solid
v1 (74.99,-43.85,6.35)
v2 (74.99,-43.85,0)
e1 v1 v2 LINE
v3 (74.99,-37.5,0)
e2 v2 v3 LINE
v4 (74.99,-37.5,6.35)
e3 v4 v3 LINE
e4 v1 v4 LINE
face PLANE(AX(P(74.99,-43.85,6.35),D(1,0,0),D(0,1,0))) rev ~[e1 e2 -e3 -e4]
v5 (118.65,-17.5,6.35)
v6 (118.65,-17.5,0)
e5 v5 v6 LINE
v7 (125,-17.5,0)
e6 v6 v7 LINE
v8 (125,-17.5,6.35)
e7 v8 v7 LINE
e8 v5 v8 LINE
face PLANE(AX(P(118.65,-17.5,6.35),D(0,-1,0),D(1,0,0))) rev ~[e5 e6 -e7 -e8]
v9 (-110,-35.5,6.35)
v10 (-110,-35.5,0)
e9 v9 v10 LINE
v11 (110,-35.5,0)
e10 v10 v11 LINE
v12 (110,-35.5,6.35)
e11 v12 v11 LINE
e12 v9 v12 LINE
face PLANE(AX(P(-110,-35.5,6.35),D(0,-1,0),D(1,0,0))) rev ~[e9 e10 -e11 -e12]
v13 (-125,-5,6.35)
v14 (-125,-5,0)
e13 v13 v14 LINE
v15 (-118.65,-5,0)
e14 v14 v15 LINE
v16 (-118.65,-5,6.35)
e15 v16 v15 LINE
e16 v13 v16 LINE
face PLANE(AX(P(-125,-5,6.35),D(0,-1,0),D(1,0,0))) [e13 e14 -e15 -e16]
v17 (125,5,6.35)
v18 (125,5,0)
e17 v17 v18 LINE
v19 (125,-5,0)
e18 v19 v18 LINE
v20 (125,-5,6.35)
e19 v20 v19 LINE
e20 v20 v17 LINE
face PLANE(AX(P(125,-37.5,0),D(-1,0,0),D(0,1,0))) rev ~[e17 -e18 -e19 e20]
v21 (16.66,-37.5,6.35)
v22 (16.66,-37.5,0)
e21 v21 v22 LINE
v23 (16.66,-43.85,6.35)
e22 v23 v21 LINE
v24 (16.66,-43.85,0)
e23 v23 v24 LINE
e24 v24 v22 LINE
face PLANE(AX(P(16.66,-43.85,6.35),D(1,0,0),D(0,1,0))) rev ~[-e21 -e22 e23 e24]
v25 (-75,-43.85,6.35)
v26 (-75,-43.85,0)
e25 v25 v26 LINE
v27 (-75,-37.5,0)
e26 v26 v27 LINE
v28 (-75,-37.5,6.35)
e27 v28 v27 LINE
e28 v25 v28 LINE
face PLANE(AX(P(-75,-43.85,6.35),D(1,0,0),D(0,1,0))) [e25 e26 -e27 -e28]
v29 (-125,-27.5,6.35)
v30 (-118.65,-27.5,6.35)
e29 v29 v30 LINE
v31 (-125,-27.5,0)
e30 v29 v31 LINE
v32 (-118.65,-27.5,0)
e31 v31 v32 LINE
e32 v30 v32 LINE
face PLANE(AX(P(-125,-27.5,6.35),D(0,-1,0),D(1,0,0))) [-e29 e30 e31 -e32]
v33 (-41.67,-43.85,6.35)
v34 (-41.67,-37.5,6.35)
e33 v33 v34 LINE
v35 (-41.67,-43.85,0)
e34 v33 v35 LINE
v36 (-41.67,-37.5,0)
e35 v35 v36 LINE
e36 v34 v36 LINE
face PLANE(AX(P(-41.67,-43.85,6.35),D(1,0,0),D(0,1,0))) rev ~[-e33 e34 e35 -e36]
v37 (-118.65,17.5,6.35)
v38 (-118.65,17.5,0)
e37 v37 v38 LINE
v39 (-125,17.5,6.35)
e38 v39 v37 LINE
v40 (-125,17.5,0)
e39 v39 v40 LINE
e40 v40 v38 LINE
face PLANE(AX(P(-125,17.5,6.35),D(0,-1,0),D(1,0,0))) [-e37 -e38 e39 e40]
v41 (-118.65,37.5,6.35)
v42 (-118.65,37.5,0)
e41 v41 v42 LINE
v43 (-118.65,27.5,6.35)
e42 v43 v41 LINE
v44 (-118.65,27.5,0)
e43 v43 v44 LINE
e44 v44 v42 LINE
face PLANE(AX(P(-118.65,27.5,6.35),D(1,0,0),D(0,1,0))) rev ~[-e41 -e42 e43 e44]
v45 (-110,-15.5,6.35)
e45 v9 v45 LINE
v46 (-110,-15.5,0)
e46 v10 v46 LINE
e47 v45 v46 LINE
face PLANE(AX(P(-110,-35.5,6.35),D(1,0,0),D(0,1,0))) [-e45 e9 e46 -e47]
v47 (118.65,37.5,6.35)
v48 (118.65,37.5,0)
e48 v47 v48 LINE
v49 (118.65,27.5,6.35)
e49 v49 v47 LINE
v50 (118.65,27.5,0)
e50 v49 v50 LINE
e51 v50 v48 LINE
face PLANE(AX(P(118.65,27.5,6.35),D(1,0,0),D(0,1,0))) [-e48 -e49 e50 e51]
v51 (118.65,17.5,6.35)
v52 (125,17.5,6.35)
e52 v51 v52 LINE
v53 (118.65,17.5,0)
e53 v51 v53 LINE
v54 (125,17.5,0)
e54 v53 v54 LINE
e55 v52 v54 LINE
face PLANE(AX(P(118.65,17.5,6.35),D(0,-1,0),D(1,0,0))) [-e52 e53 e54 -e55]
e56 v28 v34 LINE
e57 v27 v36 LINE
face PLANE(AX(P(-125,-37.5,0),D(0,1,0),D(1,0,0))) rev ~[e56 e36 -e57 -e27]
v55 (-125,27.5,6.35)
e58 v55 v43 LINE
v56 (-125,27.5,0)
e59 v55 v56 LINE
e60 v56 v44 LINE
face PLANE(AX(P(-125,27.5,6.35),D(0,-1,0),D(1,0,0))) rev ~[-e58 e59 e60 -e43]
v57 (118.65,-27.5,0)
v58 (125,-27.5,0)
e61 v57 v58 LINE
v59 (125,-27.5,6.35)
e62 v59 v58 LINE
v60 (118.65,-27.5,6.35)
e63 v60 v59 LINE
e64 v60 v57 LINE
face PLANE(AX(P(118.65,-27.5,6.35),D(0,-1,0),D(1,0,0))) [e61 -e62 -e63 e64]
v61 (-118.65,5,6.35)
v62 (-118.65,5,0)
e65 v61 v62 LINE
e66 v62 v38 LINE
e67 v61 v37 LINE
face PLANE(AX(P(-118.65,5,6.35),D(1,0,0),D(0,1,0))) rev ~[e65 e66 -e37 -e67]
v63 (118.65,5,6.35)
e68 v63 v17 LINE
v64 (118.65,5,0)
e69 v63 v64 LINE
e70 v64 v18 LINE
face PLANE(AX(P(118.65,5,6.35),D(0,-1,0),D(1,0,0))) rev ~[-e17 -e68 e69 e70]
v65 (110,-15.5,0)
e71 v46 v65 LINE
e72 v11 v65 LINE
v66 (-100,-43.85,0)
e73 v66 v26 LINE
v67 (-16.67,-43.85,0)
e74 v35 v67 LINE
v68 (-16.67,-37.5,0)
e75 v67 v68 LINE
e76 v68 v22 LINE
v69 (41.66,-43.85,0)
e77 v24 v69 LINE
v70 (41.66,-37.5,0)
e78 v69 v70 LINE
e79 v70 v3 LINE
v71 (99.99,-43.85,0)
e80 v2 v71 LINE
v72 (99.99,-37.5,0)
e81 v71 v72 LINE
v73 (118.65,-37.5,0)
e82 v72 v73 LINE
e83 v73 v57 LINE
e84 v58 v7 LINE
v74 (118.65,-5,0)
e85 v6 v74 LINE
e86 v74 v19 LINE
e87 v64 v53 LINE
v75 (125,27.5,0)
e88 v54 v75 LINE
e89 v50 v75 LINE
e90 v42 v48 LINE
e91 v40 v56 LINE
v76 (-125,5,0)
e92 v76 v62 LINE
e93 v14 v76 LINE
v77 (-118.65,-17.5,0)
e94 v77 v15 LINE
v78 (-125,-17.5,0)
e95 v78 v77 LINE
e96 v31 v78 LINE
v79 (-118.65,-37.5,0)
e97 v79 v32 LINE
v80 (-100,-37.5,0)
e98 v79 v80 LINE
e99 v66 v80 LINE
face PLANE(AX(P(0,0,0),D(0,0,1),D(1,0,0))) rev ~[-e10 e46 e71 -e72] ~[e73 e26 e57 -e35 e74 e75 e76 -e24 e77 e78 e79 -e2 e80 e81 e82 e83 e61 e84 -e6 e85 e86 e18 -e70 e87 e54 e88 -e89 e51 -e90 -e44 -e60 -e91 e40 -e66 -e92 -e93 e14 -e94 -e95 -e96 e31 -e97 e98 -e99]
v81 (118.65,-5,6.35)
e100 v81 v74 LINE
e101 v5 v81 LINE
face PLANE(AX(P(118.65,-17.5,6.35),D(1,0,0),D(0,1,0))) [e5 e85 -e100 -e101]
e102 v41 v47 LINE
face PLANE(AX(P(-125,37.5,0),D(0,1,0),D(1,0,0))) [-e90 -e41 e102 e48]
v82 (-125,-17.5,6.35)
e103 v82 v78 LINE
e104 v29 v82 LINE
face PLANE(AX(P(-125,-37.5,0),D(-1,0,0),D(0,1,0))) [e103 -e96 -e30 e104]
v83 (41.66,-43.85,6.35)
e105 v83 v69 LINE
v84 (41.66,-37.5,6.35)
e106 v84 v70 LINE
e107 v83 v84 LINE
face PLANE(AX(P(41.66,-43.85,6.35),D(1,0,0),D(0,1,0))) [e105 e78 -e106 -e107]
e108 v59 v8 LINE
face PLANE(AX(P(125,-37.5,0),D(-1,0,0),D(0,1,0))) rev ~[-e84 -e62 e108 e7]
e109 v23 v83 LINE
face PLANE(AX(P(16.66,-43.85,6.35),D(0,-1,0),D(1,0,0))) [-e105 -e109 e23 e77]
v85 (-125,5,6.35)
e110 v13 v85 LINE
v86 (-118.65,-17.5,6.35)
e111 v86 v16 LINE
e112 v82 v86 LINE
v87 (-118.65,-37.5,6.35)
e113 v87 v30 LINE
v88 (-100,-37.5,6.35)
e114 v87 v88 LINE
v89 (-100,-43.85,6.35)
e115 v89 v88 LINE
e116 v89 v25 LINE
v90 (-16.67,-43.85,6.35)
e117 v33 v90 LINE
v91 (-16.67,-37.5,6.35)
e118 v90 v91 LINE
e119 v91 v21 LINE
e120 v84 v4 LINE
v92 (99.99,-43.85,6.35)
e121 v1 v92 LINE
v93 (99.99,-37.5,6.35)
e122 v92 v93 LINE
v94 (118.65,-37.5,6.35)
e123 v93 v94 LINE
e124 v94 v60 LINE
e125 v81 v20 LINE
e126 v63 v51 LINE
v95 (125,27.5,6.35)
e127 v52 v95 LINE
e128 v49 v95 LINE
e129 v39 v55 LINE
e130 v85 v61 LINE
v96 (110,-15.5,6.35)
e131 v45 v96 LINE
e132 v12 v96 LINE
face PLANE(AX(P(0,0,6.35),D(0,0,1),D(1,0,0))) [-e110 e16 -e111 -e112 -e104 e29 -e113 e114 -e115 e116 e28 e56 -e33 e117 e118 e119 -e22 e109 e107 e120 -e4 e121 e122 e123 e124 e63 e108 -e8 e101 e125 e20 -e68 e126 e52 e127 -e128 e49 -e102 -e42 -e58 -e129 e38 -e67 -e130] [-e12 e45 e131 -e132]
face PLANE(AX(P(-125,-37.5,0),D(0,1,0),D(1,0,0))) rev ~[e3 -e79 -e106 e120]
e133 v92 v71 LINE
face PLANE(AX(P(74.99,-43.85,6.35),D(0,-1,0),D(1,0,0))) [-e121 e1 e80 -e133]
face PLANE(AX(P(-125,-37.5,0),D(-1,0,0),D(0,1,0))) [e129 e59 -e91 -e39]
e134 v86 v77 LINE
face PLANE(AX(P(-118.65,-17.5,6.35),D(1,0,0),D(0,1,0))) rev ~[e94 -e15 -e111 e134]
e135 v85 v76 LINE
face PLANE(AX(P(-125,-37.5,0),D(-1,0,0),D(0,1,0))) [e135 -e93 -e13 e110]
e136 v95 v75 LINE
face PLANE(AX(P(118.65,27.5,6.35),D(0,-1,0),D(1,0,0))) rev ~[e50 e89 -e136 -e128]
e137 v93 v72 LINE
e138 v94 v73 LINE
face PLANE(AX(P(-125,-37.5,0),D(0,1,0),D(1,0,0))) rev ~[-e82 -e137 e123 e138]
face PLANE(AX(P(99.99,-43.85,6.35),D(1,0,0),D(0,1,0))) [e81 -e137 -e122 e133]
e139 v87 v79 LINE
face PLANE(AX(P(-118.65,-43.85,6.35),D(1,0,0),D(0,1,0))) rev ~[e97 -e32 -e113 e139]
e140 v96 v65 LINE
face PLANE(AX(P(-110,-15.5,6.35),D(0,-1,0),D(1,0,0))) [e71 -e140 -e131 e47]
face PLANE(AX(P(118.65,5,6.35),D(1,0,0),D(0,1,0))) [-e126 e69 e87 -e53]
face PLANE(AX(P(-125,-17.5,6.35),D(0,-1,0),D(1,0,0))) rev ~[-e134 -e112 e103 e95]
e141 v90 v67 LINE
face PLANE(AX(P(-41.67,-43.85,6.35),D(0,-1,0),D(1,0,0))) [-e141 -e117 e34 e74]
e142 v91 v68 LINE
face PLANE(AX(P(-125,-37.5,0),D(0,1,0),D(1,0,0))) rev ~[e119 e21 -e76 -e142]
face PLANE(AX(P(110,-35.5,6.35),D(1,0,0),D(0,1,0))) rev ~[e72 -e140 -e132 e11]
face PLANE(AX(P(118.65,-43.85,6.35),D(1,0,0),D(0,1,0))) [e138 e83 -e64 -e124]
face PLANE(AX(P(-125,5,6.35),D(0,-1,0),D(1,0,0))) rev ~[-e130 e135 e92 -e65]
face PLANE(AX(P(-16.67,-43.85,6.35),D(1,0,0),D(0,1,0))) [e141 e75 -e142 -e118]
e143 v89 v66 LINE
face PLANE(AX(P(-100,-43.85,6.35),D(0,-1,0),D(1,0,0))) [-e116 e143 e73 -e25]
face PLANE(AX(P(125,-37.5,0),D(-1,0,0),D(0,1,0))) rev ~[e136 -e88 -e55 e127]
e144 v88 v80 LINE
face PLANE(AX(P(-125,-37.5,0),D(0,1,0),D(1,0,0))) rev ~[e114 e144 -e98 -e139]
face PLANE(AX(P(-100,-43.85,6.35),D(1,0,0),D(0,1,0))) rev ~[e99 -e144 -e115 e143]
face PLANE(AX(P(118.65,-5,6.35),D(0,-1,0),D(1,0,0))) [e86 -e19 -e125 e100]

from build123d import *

# Parameters (mm, degrees)
F0_W     = 250
F0_H     = 75
F1_DEPTH = 6.35
F2_W     = 25
F2_H     = 6.35
F3_DEPTH = 6.35
F4_W     = 220
F4_H     = 20
F5_DEPTH = 25
F6_W     = 6.35
F6_H     = 10
F6_H_2   = 12.5
F6_H_3   = 16.35
F7_DEPTH = 6.35


# Not quite as in the source:
# - a length typed as a fraction of an inch, garbled in the dataset ("3 / 203.2 mm" for 3/8 in), is restored


with BuildPart() as f1:
    # F0 (on Top) → F1 (new body)
    with BuildSketch(Plane.XY):
        Rectangle(F0_W, F0_H)
    extrude(amount=F1_DEPTH)

    # F2 (on face) → F3 (join, through all)
    with BuildSketch(Plane.XY.offset(6.35)):
        with Locations((-87.5, -40.675)):
            Rectangle(F2_W, F2_H)
        with Locations((-29.17, -40.675)):
            Rectangle(F2_W, F2_H)
        with Locations((29.16, -40.675)):
            Rectangle(F2_W, F2_H)
        with Locations((87.49, -40.675)):
            Rectangle(F2_W, F2_H)
    extrude(amount=-F3_DEPTH)

    # F4 (on face) → F5 (cut)
    with BuildSketch(Plane.XY.offset(6.35)):
        with Locations((0, -25.5)):
            Rectangle(F4_W, F4_H)
    extrude(amount=-F5_DEPTH, mode=Mode.SUBTRACT)

    # F6 (on face) → F7 (cut, through all)
    with BuildSketch(Plane.XY.offset(6.35)):
        with Locations((121.825, 32.5)):
            Rectangle(F6_W, F6_H)
        with Locations((121.825, 11.25)):
            Rectangle(F6_W, F6_H_2)
        with Locations((121.825, -11.25)):
            Rectangle(F6_W, F6_H_2)
        with Locations((121.825, -35.675)):
            Rectangle(F6_W, F6_H_3)
        with Locations((-121.825, -35.675)):
            Rectangle(F6_W, F6_H_3)
        with Locations((-121.825, 32.5)):
            Rectangle(F6_W, F6_H)
        with Locations((-121.825, 11.25)):
            Rectangle(F6_W, F6_H_2)
        with Locations((-121.825, -11.25)):
            Rectangle(F6_W, F6_H_2)
    extrude(amount=-F7_DEPTH, mode=Mode.SUBTRACT)


solid = f1.part
